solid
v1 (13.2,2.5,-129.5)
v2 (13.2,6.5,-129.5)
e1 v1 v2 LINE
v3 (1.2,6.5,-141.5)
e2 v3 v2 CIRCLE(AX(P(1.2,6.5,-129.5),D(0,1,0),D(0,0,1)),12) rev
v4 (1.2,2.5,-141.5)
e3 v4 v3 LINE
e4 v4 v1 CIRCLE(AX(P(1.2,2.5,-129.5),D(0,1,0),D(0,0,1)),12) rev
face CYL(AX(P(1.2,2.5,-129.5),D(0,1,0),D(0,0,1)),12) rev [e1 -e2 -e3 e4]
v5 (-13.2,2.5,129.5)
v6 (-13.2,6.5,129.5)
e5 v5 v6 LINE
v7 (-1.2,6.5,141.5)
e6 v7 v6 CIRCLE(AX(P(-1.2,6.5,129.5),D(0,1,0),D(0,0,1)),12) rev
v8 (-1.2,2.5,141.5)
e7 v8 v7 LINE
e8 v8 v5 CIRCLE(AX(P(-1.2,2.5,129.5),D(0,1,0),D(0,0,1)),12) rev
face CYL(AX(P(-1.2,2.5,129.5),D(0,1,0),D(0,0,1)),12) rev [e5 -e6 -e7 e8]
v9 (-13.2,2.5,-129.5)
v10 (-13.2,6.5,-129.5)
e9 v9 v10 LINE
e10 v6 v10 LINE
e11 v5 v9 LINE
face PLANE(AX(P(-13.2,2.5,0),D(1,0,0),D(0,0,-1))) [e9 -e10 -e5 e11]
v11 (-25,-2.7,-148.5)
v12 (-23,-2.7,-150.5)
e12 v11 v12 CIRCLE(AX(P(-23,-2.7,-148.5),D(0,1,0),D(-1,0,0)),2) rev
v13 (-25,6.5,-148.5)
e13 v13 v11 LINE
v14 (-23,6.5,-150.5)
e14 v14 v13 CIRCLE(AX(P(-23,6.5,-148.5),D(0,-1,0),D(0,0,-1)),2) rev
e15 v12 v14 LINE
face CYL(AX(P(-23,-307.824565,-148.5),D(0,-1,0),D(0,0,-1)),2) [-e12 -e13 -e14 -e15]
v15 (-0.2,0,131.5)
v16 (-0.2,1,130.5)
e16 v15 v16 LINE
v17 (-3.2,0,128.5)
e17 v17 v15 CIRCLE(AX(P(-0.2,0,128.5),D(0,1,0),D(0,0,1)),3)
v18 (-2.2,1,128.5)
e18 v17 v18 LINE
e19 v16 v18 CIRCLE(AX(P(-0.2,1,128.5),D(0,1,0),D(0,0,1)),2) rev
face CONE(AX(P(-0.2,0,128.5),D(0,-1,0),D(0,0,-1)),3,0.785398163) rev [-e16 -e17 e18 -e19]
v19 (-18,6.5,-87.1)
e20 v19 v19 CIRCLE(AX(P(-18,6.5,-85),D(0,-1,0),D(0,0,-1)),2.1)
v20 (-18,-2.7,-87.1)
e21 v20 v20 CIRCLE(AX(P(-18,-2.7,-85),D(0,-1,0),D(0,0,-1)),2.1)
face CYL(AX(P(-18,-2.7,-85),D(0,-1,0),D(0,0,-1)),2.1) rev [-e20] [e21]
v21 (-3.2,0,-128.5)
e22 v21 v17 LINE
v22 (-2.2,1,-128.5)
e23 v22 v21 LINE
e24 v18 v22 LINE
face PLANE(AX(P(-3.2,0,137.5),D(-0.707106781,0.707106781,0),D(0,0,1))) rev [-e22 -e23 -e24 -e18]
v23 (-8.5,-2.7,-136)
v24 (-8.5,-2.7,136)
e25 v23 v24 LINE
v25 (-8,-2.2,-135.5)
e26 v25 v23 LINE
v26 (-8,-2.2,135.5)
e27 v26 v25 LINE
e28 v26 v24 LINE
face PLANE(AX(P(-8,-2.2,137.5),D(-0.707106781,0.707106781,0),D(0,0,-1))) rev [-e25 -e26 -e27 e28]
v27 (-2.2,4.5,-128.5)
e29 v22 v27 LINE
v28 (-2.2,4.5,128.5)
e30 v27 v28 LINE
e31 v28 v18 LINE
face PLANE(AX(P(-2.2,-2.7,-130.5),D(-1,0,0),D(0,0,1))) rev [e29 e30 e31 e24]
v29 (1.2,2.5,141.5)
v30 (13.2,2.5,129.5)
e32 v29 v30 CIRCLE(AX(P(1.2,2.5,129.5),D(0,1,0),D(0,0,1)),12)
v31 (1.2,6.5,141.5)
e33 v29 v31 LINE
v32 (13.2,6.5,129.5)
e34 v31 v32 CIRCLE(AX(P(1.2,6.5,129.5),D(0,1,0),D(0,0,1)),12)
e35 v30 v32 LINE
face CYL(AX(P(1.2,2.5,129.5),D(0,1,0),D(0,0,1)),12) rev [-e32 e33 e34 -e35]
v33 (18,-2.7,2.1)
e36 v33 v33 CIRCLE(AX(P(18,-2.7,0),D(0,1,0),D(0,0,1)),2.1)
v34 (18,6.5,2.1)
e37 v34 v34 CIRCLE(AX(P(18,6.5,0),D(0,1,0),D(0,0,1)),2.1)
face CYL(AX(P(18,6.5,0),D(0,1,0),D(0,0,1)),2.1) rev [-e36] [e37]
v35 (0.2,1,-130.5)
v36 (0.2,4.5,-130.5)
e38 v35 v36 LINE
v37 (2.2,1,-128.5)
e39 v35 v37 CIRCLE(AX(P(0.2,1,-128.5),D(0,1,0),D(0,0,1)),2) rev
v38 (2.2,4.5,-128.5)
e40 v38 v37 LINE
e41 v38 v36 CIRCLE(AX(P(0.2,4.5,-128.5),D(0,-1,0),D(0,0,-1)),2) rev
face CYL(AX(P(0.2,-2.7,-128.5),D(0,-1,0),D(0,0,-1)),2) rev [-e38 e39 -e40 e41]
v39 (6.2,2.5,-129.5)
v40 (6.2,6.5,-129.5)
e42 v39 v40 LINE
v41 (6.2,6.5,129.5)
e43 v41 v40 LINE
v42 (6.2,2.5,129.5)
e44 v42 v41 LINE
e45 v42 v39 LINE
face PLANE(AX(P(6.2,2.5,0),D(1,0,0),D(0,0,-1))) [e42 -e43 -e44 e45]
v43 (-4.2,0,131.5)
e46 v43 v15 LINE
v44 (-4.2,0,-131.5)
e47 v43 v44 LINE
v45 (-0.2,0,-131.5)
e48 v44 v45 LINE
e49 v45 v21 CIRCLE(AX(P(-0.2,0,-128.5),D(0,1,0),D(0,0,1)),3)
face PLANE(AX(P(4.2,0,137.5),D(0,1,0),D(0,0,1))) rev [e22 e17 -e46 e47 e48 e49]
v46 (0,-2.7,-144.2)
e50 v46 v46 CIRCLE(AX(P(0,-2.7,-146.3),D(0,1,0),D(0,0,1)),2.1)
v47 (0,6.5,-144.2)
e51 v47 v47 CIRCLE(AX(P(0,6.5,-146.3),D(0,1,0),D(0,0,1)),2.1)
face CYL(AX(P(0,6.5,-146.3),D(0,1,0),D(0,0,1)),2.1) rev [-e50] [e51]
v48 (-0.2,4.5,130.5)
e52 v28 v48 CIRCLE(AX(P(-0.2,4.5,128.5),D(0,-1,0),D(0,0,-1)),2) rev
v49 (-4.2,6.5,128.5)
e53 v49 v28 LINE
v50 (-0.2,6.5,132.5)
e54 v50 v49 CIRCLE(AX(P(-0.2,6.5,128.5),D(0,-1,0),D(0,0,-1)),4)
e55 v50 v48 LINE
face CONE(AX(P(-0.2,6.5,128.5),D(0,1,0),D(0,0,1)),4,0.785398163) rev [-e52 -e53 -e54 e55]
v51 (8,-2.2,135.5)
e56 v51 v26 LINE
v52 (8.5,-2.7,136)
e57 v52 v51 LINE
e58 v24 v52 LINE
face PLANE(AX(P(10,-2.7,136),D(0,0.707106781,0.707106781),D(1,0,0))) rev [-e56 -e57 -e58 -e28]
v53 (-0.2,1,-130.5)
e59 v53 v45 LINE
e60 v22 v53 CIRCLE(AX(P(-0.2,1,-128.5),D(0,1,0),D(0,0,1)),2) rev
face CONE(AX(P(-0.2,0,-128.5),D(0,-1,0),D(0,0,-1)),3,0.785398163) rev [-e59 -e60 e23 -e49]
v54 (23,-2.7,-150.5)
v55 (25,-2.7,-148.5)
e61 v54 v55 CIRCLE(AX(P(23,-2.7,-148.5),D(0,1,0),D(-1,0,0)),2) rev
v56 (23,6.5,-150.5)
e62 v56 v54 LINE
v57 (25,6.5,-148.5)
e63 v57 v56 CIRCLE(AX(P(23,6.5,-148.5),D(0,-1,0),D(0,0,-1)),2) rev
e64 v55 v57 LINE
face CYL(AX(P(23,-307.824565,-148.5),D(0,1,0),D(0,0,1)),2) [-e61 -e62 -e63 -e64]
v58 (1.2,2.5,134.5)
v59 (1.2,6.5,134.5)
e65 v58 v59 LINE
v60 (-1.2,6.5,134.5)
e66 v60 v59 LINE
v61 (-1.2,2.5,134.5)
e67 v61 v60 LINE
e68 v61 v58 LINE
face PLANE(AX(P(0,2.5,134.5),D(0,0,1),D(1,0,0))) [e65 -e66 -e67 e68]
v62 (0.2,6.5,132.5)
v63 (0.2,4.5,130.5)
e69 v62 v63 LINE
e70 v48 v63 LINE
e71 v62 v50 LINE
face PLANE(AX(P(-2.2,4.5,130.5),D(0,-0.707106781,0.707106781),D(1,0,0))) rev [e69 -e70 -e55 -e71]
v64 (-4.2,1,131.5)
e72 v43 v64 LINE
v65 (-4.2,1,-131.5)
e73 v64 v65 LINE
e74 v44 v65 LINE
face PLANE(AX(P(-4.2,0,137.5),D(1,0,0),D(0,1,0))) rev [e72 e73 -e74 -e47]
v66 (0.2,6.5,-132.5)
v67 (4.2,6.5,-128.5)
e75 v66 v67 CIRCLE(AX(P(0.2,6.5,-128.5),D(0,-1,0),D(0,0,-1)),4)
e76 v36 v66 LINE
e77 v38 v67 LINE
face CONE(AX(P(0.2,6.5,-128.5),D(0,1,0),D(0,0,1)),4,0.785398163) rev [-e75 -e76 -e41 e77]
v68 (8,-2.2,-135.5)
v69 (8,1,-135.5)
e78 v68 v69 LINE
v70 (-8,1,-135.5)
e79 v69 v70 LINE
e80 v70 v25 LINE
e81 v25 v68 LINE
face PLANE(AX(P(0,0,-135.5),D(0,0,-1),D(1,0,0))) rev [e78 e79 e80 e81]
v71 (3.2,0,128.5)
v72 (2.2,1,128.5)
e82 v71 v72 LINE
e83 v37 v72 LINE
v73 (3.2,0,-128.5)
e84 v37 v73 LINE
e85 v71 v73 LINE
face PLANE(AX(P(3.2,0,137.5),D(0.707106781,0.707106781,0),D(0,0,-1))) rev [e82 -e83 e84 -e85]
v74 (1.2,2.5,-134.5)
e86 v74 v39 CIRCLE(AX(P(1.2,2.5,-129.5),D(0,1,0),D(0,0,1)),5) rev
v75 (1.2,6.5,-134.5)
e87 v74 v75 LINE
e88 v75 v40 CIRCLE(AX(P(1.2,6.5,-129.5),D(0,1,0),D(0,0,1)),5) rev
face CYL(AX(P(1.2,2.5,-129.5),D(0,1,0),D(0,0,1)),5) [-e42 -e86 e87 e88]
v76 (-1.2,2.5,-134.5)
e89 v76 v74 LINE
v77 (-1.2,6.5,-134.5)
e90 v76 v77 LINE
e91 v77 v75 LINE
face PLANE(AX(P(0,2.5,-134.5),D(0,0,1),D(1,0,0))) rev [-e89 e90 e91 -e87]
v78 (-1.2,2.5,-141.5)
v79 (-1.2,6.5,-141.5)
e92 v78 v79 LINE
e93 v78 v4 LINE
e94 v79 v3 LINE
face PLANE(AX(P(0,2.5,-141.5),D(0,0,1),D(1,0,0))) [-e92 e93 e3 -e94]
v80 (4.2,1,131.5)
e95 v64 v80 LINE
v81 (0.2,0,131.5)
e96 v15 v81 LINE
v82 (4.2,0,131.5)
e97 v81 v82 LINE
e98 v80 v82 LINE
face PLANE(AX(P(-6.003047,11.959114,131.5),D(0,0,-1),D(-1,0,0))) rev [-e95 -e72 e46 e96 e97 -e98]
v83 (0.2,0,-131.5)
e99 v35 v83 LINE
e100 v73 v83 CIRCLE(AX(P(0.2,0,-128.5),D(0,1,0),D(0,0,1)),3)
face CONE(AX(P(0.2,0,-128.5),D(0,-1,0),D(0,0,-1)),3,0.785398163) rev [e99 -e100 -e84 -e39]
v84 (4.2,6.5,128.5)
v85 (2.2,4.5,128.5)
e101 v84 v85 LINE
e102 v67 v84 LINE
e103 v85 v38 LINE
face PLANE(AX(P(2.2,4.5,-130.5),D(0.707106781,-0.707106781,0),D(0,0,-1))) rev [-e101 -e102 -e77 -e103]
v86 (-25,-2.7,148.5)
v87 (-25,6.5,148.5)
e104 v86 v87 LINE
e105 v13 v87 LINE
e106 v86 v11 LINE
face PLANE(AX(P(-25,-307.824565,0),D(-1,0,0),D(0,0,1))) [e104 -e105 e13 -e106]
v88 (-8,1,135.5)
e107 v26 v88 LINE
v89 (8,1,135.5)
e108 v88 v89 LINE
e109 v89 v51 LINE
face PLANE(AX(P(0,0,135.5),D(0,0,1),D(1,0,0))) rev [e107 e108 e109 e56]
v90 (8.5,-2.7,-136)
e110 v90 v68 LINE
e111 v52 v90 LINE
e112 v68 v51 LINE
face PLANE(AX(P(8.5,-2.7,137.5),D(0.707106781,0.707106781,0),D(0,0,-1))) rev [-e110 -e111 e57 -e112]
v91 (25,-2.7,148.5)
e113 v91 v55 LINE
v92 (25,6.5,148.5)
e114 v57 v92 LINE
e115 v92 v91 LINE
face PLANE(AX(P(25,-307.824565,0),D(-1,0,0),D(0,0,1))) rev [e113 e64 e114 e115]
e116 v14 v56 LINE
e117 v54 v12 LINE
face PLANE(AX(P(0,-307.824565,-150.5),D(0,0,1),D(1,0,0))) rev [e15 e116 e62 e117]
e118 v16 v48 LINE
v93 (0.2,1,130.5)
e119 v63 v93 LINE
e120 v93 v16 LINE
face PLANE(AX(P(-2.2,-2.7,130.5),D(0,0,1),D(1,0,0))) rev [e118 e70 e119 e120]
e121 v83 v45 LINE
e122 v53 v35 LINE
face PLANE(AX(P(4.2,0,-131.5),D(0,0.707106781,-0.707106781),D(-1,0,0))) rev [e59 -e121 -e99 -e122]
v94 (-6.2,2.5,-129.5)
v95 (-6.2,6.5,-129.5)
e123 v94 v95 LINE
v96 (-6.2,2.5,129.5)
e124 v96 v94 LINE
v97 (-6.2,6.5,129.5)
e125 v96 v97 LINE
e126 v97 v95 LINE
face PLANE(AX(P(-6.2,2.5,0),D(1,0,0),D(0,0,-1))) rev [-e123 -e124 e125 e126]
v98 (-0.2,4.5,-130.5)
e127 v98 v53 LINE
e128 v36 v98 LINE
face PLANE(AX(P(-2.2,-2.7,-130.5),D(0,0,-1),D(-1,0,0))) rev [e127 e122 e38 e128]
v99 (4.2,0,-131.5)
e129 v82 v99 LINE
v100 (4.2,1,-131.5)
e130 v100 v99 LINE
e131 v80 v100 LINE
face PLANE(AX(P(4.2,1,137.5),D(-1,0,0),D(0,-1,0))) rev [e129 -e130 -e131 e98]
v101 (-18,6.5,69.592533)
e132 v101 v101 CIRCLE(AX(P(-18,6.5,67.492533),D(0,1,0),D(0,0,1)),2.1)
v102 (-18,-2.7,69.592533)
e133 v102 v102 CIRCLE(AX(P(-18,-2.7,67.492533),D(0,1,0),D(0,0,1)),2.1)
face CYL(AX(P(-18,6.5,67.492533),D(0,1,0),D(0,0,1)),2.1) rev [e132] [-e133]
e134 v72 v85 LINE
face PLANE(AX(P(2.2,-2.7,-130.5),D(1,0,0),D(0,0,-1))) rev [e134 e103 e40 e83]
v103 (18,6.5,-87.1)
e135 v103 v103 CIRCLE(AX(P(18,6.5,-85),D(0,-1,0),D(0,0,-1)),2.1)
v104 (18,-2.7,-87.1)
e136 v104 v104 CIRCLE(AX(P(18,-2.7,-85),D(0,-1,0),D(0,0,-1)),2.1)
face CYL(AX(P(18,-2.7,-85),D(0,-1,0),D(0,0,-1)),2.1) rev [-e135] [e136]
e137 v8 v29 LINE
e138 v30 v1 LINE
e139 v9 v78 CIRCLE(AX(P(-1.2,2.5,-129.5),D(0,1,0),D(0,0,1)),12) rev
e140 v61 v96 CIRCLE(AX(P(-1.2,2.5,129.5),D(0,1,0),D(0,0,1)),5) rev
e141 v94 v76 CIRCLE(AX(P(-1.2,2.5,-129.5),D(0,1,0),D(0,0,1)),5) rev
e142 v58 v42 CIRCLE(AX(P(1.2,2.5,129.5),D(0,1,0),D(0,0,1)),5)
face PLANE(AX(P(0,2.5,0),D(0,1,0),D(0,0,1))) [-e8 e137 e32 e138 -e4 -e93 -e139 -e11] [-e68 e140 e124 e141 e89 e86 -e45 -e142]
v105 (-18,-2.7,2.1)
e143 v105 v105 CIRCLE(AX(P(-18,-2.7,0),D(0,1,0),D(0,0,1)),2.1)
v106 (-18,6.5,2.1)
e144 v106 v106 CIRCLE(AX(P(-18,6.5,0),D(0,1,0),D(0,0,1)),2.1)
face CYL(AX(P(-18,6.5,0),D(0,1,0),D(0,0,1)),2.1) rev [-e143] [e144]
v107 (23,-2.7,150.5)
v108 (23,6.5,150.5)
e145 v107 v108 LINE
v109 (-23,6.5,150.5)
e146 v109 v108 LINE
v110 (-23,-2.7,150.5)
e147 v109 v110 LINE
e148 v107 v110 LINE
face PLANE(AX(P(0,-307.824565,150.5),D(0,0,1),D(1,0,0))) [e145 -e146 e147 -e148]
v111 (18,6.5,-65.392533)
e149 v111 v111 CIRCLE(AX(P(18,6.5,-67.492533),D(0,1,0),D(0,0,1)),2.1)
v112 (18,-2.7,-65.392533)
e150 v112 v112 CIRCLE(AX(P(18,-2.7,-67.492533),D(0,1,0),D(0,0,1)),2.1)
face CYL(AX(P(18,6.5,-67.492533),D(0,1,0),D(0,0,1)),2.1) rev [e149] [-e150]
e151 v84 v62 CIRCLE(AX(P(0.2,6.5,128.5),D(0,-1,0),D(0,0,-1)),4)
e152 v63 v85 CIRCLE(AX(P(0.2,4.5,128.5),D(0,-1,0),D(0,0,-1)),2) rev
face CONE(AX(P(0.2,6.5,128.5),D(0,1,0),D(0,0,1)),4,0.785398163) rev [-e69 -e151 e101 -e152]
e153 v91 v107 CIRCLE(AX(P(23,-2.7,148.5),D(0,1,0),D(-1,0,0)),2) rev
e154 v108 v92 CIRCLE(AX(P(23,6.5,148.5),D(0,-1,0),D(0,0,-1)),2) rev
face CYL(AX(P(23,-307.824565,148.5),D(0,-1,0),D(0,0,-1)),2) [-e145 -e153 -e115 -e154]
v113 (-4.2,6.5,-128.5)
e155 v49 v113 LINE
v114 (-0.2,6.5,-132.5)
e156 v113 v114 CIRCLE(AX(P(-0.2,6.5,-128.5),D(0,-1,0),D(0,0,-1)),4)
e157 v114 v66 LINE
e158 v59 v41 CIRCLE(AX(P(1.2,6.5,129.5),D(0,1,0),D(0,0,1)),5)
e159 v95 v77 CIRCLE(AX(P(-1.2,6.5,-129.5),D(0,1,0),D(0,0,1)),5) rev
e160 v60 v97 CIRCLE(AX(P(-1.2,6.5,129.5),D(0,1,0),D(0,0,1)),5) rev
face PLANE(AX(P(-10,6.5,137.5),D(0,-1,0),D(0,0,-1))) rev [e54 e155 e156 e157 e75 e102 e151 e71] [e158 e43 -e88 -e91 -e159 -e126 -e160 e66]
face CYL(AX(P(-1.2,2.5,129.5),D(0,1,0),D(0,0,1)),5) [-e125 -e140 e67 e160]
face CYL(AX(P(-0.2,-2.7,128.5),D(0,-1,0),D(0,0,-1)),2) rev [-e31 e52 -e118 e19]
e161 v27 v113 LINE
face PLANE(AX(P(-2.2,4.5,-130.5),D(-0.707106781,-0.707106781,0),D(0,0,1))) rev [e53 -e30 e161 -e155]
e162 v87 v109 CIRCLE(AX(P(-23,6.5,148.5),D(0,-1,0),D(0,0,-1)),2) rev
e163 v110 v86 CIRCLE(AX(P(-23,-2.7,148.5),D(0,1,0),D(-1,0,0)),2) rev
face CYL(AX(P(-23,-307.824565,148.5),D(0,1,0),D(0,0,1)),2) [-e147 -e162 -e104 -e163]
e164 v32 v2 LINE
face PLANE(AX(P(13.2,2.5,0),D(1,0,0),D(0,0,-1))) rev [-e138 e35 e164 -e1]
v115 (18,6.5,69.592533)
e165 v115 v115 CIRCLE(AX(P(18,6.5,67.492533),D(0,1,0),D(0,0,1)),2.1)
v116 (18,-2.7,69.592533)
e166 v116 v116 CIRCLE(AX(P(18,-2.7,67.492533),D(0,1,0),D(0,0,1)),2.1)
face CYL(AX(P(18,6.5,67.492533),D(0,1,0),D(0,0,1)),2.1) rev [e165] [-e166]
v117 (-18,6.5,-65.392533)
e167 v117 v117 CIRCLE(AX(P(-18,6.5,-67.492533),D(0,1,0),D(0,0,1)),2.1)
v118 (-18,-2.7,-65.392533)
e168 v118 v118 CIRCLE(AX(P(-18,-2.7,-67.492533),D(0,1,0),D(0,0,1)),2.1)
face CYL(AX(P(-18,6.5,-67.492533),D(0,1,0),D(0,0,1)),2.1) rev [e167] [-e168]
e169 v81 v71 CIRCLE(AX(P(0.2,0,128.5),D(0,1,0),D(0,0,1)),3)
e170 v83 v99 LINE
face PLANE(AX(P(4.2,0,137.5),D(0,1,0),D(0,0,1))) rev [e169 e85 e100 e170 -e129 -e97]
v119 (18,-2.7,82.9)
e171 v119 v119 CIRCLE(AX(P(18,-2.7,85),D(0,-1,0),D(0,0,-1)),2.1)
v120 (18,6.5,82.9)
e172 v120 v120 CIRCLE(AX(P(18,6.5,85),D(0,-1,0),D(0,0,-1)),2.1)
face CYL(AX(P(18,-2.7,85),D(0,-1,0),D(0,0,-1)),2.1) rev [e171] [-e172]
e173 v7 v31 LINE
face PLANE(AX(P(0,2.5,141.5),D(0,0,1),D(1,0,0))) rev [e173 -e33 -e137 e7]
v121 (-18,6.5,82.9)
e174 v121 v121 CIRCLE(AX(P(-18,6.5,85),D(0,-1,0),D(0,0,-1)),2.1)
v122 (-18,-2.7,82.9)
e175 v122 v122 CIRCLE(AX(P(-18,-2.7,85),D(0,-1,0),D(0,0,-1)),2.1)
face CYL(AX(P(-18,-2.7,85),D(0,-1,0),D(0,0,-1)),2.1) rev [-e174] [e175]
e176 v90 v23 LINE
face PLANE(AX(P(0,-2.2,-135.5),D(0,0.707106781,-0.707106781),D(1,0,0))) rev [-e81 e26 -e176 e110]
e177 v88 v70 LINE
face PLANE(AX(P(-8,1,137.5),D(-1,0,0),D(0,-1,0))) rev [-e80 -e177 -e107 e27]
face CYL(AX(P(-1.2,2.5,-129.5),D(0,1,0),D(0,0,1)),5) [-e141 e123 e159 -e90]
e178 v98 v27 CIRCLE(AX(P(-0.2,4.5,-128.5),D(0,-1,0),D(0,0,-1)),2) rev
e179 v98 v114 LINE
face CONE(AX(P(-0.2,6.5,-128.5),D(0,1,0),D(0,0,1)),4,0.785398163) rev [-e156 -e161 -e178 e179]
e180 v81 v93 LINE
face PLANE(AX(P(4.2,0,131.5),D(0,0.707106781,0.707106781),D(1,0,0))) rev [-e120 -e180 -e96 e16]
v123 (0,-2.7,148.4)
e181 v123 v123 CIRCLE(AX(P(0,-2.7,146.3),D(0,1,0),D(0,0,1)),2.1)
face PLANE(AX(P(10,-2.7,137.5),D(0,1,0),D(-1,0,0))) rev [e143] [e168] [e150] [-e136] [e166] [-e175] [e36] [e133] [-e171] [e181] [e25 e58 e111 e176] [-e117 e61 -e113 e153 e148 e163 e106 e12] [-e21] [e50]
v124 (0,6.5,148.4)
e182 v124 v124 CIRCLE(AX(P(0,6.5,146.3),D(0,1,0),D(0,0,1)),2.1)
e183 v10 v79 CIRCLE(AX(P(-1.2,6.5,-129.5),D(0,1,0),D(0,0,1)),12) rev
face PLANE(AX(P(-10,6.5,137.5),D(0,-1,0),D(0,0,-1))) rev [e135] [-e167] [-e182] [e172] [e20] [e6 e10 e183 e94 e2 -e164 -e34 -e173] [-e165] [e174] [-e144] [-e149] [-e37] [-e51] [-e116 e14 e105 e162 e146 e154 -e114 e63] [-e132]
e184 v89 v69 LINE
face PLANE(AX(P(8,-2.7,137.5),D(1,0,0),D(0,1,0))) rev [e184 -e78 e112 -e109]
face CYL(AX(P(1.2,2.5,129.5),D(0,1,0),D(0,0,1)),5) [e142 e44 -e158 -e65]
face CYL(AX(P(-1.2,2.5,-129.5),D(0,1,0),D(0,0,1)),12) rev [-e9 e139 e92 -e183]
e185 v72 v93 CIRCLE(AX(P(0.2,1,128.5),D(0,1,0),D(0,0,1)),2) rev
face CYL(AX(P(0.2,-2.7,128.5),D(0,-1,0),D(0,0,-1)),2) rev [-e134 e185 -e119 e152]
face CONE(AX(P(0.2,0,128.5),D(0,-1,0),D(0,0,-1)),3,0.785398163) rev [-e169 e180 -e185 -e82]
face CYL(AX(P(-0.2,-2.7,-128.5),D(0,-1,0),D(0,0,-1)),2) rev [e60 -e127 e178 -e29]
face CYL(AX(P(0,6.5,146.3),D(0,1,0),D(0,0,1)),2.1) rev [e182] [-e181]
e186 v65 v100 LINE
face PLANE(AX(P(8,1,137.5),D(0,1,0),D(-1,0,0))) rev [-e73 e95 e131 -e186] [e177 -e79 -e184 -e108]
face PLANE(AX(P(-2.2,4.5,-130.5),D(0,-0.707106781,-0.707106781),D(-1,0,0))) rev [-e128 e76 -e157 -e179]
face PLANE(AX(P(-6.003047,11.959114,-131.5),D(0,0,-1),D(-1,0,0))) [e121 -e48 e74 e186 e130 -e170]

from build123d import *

# Parameters (mm, degrees)
BOSS_EXTRUDE1_DEPTH   = 137.5
SKETCH3_W             = 20
SKETCH3_H             = 9.2
BOSS_EXTRUDE2_DEPTH   = 2
SKETCH2_W             = 4.4
SKETCH2_H             = 261
CUT_EXTRUDE1_DEPTH    = 139.169786857
FILLET3_R             = 2
CHAMFER1_SIZE         = 1
SKETCH4_W             = 10.203047284
SKETCH4_H             = 4
CUT_EXTRUDE2_DEPTH    = 1
CHAMFER4_SIZE         = 2
SKETCH5_W             = 20
SKETCH5_H             = 275
BOSS_EXTRUDE3_DEPTH   = 9.2
M5_TAPPED_HOLE1_D     = 4.2
CRVPATTERN1_START     = -2.7
CRVPATTERN1_OUTLINE_R = 2.1
CRVPATTERN1_DEPTH     = 9.2
CUT_EXTRUDE3_DEPTH    = 4
M5_TAPPED_HOLE2_D     = 4.2
M5_TAPPED_HOLE2_DEPTH = 11.1381927
M5_TAPPED_HOLE2_TIP   = 1.2618073
FILLET4_R             = 2
CHAMFER5_SIZE         = 0.5


# Read off the part's stored shape, not the designer's step: CrvPattern1
with BuildPart() as part:
    # Sketch1 → Boss-Extrude1 (new, symmetric)
    with BuildSketch(Plane.XY):
        Polygon((-10, -2.7), (-10, 6.5), (10, 6.5), (10, -2.7), (8, -2.7), (8, 1), (4.2, 1), (4.2, 0), (-4.2, 0), (-4.2, 1), (-8, 1), (-8, -2.7), align=None)
    extrude(amount=BOSS_EXTRUDE1_DEPTH, both=True)

    # Sketch3 → Boss-Extrude2 (add)
    with BuildSketch(Plane.XY.offset(137.5)):
        with Locations((0, 1.9)):
            Rectangle(SKETCH3_W, SKETCH3_H)
    boss_extrude2 = extrude(amount=-BOSS_EXTRUDE2_DEPTH)

    # Mirror1: Boss-Extrude2 across plane
    add(boss_extrude2.mirror(Plane.XY))

    # Sketch2 → Cut-Extrude1 (cut, through all)
    with BuildSketch(Plane(origin=(0, 6.5, 0), x_dir=(1, 0, 0), z_dir=(0, 1, 0))):
        Rectangle(SKETCH2_W, SKETCH2_H)
    extrude(amount=-CUT_EXTRUDE1_DEPTH, mode=Mode.SUBTRACT)

    # Fillet3
    fillet3_edges = [part.edges().sort_by_distance(p)[0] for p in [
        (2.2, 3.25, -130.5),
        (2.2, 3.25, 130.5),
        (-2.2, 3.25, 130.5),
        (-2.2, 3.25, -130.5),
    ]]
    fillet(fillet3_edges, radius=FILLET3_R)

    # Chamfer1
    chamfer1_edges = [part.edges().sort_by_distance(p)[0] for p in [
        (-2.2, 0, 0),
        (0, 0, -130.5),
        (2.2, 0, 0),
        (0, 0, 130.5),
        (-1.614213562, 0, -129.914213562),
        (1.614213562, 0, -129.914213562),
        (1.614213562, 0, 129.914213562),
        (-1.614213562, 0, 129.914213562),
    ]]
    chamfer(chamfer1_edges, length=CHAMFER1_SIZE)

    # Sketch4 → Cut-Extrude2 (cut)
    with BuildSketch(Plane.XZ):
        with Locations((-0.901523642, 133.5)):
            Rectangle(SKETCH4_W, SKETCH4_H)
    cut_extrude2 = extrude(amount=-CUT_EXTRUDE2_DEPTH, mode=Mode.SUBTRACT)

    # Mirror2: Cut-Extrude2 across plane
    add(cut_extrude2.mirror(Plane.XY), mode=Mode.SUBTRACT)

    # Chamfer4
    chamfer4_edges = [part.edges().sort_by_distance(p)[0] for p in [
        (-2.2, 6.5, 0),
        (0, 6.5, -130.5),
        (2.2, 6.5, 0),
        (0, 6.5, 130.5),
        (-1.614213562, 6.5, -129.914213562),
        (1.614213562, 6.5, -129.914213562),
        (1.614213562, 6.5, 129.914213562),
        (-1.614213562, 6.5, 129.914213562),
    ]]
    chamfer(chamfer4_edges, length=CHAMFER4_SIZE)

    # Sketch5 → Boss-Extrude3 (add)
    with BuildSketch(Plane(origin=(0, 6.5, 0), x_dir=(1, 0, 0), z_dir=(0, 1, 0))):
        Polygon((-25, 137.5), (-25, -137.5), (-25, -150.5), (25, -150.5), (25, -137.5), (25, 137.5), (25, 150.5), (-25, 150.5), align=None)
        Rectangle(SKETCH5_W, SKETCH5_H, mode=Mode.SUBTRACT)
    extrude(amount=-BOSS_EXTRUDE3_DEPTH)

    # M5 Tapped Hole1 (through all)
    with Locations(Plane(origin=(0, 6.5, 0), x_dir=(1, 0, 0), z_dir=(0, 1, 0))):
        with Locations((-18, 0)):
            Hole(M5_TAPPED_HOLE1_D / 2)

    # CrvPattern1 outline → CrvPattern1 (cut)
    with BuildSketch(Plane(origin=(0, 0, 0), x_dir=(1, 0, 0), z_dir=(0, 1, 0)).offset(CRVPATTERN1_START)):
        with Locations((-18, -67.49253334)):
            Circle(CRVPATTERN1_OUTLINE_R)
        with Locations((0, -146.3)):
            Circle(CRVPATTERN1_OUTLINE_R)
        with Locations((18, -67.49253334)):
            Circle(CRVPATTERN1_OUTLINE_R)
        with Locations((18, 0)):
            Circle(CRVPATTERN1_OUTLINE_R)
        with Locations((18, 67.49253334)):
            Circle(CRVPATTERN1_OUTLINE_R)
        with Locations((0, 146.3)):
            Circle(CRVPATTERN1_OUTLINE_R)
        with Locations((-18, 67.49253334)):
            Circle(CRVPATTERN1_OUTLINE_R)
    extrude(amount=CRVPATTERN1_DEPTH, mode=Mode.SUBTRACT)

    # Sketch9 → Cut-Extrude3 (cut)
    with BuildSketch(Plane(origin=(0, 6.5, 0), x_dir=(1, 0, 0), z_dir=(0, 1, 0))):
        with BuildLine():
            Line((-1.2, -141.5), (1.2, -141.5))
            ThreePointArc((1.2, -141.5), (9.685281374, -137.985281374), (13.2, -129.5))
            Line((13.2, -129.5), (13.2, 129.5))
            ThreePointArc((13.2, 129.5), (9.685281374, 137.985281374), (1.2, 141.5))
            Line((1.2, 141.5), (-1.2, 141.5))
            ThreePointArc((-1.2, 141.5), (-9.685281374, 137.985281374), (-13.2, 129.5))
            Line((-13.2, 129.5), (-13.2, -129.5))
            ThreePointArc((-13.2, -129.5), (-9.685281374, -137.985281374), (-1.2, -141.5))
        make_face()
        with BuildLine():
            Line((-6.2, -129.5), (-6.2, 129.5))
            ThreePointArc((-6.2, 129.5), (-4.735533906, 133.035533906), (-1.2, 134.5))
            Line((-1.2, 134.5), (1.2, 134.5))
            ThreePointArc((1.2, 134.5), (4.735533906, 133.035533906), (6.2, 129.5))
            Line((6.2, 129.5), (6.2, -129.5))
            ThreePointArc((6.2, -129.5), (4.735533906, -133.035533906), (1.2, -134.5))
            Line((1.2, -134.5), (-1.2, -134.5))
            ThreePointArc((-1.2, -134.5), (-4.735533906, -133.035533906), (-6.2, -129.5))
        make_face(mode=Mode.SUBTRACT)
    extrude(amount=-CUT_EXTRUDE3_DEPTH, mode=Mode.SUBTRACT)

    # M5 Tapped Hole2
    with Locations(Plane(origin=(0, -2.7, 0), x_dir=(-1, 0, 0), z_dir=(0, -1, 0))):
        with Locations((18, 85), (18, -85), (-18, -85), (-18, 85)):
            Hole(M5_TAPPED_HOLE2_D / 2, depth=M5_TAPPED_HOLE2_DEPTH)
            with Locations((0, 0, -(M5_TAPPED_HOLE2_DEPTH + M5_TAPPED_HOLE2_TIP / 2))):  # 118° drill point
                Cone(0, M5_TAPPED_HOLE2_D / 2, M5_TAPPED_HOLE2_TIP, mode=Mode.SUBTRACT)

    # Fillet4
    fillet4_edges = [part.edges().sort_by_distance(p)[0] for p in [
        (-25, 1.9, 150.5),
        (-25, 1.9, -150.5),
        (25, 1.9, -150.5),
        (25, 1.9, 150.5),
    ]]
    fillet(fillet4_edges, radius=FILLET4_R)

    # Chamfer5
    chamfer5_edges = [part.edges().sort_by_distance(p)[0] for p in [
        (8, -2.7, 0),
        (-8, -2.7, 0),
        (0, -2.7, 135.5),
        (0, -2.7, -135.5),
    ]]
    chamfer(chamfer5_edges, length=CHAMFER5_SIZE)


solid = part.part
